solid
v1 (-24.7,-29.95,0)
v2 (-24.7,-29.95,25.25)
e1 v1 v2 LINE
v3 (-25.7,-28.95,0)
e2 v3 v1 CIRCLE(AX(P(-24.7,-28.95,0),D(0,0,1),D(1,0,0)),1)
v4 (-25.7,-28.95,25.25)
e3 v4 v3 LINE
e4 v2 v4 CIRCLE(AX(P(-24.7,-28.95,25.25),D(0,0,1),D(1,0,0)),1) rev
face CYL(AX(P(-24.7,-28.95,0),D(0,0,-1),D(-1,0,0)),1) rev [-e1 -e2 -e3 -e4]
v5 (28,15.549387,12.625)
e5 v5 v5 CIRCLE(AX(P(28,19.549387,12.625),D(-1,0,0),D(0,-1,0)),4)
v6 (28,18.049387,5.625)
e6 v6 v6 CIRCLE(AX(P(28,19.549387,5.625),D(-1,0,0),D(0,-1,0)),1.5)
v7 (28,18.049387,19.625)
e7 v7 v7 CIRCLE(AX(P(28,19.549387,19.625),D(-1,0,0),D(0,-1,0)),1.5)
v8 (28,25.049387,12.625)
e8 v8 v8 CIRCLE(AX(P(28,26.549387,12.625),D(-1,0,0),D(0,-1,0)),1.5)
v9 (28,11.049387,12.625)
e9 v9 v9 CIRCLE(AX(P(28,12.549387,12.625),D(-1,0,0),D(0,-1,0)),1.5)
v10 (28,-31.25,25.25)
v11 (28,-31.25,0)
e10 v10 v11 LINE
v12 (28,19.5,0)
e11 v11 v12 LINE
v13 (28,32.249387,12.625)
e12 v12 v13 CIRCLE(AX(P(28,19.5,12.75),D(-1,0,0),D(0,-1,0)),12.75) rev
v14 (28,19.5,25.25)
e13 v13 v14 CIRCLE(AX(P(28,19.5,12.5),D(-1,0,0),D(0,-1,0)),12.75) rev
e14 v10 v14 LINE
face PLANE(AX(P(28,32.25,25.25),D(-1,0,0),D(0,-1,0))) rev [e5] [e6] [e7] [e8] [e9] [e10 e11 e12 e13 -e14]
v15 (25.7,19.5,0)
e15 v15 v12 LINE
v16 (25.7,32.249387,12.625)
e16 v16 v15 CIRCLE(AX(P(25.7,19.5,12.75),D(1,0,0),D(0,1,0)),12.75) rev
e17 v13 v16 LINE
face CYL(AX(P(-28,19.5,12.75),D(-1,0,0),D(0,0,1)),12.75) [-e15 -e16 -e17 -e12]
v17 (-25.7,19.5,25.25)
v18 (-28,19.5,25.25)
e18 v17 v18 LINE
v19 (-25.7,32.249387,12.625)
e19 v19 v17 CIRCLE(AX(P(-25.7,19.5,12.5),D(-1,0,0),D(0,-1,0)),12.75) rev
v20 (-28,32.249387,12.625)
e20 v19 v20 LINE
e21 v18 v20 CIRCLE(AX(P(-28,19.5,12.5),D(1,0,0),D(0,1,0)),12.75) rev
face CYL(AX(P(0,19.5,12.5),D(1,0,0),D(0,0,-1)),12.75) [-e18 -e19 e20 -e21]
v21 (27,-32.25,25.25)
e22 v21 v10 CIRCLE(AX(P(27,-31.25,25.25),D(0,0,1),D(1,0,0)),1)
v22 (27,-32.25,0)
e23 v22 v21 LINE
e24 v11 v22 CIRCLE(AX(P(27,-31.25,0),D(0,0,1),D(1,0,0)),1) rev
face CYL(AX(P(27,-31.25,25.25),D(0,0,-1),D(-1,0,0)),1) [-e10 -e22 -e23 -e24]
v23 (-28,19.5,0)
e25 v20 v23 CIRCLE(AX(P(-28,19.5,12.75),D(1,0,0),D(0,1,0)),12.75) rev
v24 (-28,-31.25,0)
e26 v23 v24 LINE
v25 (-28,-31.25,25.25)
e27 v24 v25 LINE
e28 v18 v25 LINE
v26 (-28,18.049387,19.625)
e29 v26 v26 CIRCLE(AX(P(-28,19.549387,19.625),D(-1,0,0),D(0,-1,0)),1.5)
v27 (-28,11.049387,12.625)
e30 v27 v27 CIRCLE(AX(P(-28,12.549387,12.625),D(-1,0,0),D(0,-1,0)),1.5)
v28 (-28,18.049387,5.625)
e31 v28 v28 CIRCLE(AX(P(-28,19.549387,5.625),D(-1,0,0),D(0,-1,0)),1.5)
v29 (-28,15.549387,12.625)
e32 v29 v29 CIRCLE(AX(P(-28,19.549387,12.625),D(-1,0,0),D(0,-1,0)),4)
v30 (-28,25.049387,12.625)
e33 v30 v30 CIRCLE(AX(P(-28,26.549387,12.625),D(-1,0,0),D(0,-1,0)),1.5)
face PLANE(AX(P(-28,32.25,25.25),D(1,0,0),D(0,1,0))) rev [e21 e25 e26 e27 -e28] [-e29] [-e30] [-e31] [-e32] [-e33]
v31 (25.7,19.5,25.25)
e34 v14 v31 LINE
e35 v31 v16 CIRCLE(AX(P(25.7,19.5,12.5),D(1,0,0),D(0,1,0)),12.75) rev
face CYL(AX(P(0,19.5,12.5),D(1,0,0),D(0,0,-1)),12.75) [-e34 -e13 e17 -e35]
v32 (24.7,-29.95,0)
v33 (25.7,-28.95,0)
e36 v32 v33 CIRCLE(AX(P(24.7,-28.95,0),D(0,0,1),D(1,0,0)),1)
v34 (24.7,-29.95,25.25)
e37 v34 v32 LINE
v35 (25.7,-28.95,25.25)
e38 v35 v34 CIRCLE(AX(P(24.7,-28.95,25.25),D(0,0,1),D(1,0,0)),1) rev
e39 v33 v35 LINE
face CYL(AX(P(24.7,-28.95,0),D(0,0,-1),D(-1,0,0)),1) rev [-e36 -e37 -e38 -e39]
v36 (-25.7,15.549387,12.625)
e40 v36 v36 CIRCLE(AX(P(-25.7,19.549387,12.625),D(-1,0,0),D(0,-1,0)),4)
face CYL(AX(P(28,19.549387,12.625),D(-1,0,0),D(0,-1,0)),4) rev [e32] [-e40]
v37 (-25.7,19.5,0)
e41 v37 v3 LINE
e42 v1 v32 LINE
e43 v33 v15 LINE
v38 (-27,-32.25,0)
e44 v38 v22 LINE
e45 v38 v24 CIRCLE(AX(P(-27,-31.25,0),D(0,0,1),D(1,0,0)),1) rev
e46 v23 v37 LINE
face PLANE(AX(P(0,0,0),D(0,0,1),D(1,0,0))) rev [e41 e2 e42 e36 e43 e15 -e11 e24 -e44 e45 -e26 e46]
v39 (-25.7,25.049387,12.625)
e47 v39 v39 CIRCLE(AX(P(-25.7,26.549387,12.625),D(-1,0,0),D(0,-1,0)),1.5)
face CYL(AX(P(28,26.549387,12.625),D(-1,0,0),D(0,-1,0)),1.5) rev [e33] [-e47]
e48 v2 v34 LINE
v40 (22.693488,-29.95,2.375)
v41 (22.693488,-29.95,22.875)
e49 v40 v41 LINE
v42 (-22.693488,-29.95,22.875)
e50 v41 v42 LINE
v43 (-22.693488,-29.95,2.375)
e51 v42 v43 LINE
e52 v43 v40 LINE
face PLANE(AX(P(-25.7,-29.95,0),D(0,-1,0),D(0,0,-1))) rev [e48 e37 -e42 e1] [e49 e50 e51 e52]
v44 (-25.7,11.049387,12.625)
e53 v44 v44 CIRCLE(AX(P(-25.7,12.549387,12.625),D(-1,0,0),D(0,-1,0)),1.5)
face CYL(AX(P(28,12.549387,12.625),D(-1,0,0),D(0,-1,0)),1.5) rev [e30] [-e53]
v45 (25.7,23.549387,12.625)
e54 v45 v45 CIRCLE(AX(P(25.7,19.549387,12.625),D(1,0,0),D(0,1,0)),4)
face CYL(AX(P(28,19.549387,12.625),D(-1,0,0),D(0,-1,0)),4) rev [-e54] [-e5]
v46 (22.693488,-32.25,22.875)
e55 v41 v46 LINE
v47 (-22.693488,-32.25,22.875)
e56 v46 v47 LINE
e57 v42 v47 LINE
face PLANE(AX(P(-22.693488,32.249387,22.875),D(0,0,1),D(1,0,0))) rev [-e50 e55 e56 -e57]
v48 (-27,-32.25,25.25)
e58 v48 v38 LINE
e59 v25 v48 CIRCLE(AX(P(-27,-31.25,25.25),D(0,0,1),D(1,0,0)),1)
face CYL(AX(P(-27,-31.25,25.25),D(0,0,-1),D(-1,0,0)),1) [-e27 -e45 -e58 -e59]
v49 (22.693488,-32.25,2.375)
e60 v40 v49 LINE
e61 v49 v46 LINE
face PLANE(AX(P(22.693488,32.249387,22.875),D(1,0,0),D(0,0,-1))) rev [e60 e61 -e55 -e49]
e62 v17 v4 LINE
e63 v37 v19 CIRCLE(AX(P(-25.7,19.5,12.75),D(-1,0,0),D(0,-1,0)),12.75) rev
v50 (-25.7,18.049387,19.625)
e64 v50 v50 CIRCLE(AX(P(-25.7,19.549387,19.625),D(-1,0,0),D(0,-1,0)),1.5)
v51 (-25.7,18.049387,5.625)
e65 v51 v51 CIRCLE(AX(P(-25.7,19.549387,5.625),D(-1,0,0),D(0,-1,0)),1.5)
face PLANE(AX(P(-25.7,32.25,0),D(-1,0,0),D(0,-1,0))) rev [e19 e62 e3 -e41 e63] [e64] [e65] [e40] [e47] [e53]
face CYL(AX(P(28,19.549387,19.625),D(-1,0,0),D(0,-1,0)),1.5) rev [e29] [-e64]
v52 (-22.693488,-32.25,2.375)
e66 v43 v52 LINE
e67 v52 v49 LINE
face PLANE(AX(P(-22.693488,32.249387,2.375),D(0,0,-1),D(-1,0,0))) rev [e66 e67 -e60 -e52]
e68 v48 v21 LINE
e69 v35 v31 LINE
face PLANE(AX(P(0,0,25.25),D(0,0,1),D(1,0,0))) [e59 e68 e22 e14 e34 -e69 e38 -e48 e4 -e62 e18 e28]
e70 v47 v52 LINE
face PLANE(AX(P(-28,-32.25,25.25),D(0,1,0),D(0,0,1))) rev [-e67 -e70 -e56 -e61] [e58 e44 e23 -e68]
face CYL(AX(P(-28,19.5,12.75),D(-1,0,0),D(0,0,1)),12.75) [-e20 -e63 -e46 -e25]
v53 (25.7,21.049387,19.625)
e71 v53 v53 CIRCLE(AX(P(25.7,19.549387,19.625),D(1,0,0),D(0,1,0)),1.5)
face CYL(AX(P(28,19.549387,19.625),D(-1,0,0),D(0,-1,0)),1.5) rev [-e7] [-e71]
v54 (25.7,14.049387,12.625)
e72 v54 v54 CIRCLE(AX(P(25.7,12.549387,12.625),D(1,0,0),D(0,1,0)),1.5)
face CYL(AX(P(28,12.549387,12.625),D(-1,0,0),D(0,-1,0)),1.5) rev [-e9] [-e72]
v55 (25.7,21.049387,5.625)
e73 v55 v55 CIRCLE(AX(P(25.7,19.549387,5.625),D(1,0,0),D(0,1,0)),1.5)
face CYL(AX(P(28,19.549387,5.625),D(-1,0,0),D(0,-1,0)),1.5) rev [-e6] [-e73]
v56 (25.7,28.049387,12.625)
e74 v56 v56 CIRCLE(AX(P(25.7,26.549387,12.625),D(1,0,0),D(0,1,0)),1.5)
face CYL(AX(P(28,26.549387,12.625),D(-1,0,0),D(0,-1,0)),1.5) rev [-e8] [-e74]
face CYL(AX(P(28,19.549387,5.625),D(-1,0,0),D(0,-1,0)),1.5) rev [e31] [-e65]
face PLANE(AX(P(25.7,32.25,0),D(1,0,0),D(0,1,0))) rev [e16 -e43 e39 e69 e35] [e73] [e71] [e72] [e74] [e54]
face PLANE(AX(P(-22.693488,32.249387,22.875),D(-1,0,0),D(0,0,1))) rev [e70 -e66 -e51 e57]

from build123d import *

# Parameters (mm, degrees)
SKETCH1_W           = 56
SKETCH1_H           = 64.5
BOSS_EXTRUDE1_DEPTH = 25.25
SKETCH2_W           = 51.4
SKETCH2_H           = 62.2
CUT_EXTRUDE1_DEPTH  = 50.614765947
FILLET1_R           = 1
FILLET3_R           = 12.75
SKETCH4_W           = 45.38697638
SKETCH4_H           = 20.5
CUT_EXTRUDE3_DEPTH  = 75.710999554
SKETCH5_R           = 4
SKETCH5_R_2         = 1.5
CUT_EXTRUDE4_DEPTH  = 70.380292591


with BuildPart() as part:
    # Sketch1 → Boss-Extrude1 (new body)
    with BuildSketch(Plane.XY):
        Rectangle(SKETCH1_W, SKETCH1_H)
    extrude(amount=BOSS_EXTRUDE1_DEPTH)

    # Sketch2 → Cut-Extrude1 (cut, through all)
    with BuildSketch(Plane.XY.offset(25.25)):
        with Locations((0, 1.15)):
            Rectangle(SKETCH2_W, SKETCH2_H)
    extrude(amount=-CUT_EXTRUDE1_DEPTH, mode=Mode.SUBTRACT)

    # Fillet1
    fillet1_edges = [part.edges().sort_by_distance(p)[0] for p in [
        (-25.7, -29.95, 12.625),
        (25.7, -29.95, 12.625),
        (28, -32.25, 12.625),
        (-28, -32.25, 12.625),
    ]]
    fillet(fillet1_edges, radius=FILLET1_R)

    # Fillet3
    # the kernel refuses this fillet: 12.75 mm, written as the material it takes off along each edge
    with BuildSketch(Plane(origin=(-59.875, 32.25, 25.25), x_dir=(0, 0, -1), z_dir=(1, 0, 0)), Plane(origin=(-6.175, 32.25, 25.25), x_dir=(0, 0, -1), z_dir=(1, 0, 0)), Plane(origin=(-59.875, 32.25, 0), x_dir=(0, -1, 0), z_dir=(1, 0, 0)), Plane(origin=(-6.175, 32.25, 0), x_dir=(0, -1, 0), z_dir=(1, 0, 0))) as fillet3_piece_1:
        with BuildLine():
            CenterArc((FILLET3_R, -FILLET3_R), FILLET3_R, 90, 90)
            Line((0, -FILLET3_R), (0, 0))
            Line((0, 0), (FILLET3_R, 0))
        make_face()
    extrude(amount=66.05, mode=Mode.SUBTRACT)

    # Sketch4 → Cut-Extrude3 (cut, through all)
    with BuildSketch(Plane.XZ.offset(32.25)):
        with Locations((0, 12.625)):
            Rectangle(SKETCH4_W, SKETCH4_H)
    extrude(amount=-CUT_EXTRUDE3_DEPTH, mode=Mode.SUBTRACT)

    # Sketch5 → Cut-Extrude4 (cut, through all)
    with BuildSketch(Plane.ZY.offset(28)):
        with Locations(Location((12.625, 19.54938724, 0), (0, 0, 270))):
            Circle(SKETCH5_R)
        with Locations(Location((12.625, 26.54938724, 0), (0, 0, 270))):
            Circle(SKETCH5_R_2)
        with Locations(Location((19.625, 19.54938724, 0), (0, 0, 270))):
            Circle(SKETCH5_R_2)
        with Locations(Location((12.625, 12.54938724, 0), (0, 0, 270))):
            Circle(SKETCH5_R_2)
        with Locations(Location((5.625, 19.54938724, 0), (0, 0, 270))):
            Circle(SKETCH5_R_2)
    extrude(amount=-CUT_EXTRUDE4_DEPTH, mode=Mode.SUBTRACT)


solid = part.part
